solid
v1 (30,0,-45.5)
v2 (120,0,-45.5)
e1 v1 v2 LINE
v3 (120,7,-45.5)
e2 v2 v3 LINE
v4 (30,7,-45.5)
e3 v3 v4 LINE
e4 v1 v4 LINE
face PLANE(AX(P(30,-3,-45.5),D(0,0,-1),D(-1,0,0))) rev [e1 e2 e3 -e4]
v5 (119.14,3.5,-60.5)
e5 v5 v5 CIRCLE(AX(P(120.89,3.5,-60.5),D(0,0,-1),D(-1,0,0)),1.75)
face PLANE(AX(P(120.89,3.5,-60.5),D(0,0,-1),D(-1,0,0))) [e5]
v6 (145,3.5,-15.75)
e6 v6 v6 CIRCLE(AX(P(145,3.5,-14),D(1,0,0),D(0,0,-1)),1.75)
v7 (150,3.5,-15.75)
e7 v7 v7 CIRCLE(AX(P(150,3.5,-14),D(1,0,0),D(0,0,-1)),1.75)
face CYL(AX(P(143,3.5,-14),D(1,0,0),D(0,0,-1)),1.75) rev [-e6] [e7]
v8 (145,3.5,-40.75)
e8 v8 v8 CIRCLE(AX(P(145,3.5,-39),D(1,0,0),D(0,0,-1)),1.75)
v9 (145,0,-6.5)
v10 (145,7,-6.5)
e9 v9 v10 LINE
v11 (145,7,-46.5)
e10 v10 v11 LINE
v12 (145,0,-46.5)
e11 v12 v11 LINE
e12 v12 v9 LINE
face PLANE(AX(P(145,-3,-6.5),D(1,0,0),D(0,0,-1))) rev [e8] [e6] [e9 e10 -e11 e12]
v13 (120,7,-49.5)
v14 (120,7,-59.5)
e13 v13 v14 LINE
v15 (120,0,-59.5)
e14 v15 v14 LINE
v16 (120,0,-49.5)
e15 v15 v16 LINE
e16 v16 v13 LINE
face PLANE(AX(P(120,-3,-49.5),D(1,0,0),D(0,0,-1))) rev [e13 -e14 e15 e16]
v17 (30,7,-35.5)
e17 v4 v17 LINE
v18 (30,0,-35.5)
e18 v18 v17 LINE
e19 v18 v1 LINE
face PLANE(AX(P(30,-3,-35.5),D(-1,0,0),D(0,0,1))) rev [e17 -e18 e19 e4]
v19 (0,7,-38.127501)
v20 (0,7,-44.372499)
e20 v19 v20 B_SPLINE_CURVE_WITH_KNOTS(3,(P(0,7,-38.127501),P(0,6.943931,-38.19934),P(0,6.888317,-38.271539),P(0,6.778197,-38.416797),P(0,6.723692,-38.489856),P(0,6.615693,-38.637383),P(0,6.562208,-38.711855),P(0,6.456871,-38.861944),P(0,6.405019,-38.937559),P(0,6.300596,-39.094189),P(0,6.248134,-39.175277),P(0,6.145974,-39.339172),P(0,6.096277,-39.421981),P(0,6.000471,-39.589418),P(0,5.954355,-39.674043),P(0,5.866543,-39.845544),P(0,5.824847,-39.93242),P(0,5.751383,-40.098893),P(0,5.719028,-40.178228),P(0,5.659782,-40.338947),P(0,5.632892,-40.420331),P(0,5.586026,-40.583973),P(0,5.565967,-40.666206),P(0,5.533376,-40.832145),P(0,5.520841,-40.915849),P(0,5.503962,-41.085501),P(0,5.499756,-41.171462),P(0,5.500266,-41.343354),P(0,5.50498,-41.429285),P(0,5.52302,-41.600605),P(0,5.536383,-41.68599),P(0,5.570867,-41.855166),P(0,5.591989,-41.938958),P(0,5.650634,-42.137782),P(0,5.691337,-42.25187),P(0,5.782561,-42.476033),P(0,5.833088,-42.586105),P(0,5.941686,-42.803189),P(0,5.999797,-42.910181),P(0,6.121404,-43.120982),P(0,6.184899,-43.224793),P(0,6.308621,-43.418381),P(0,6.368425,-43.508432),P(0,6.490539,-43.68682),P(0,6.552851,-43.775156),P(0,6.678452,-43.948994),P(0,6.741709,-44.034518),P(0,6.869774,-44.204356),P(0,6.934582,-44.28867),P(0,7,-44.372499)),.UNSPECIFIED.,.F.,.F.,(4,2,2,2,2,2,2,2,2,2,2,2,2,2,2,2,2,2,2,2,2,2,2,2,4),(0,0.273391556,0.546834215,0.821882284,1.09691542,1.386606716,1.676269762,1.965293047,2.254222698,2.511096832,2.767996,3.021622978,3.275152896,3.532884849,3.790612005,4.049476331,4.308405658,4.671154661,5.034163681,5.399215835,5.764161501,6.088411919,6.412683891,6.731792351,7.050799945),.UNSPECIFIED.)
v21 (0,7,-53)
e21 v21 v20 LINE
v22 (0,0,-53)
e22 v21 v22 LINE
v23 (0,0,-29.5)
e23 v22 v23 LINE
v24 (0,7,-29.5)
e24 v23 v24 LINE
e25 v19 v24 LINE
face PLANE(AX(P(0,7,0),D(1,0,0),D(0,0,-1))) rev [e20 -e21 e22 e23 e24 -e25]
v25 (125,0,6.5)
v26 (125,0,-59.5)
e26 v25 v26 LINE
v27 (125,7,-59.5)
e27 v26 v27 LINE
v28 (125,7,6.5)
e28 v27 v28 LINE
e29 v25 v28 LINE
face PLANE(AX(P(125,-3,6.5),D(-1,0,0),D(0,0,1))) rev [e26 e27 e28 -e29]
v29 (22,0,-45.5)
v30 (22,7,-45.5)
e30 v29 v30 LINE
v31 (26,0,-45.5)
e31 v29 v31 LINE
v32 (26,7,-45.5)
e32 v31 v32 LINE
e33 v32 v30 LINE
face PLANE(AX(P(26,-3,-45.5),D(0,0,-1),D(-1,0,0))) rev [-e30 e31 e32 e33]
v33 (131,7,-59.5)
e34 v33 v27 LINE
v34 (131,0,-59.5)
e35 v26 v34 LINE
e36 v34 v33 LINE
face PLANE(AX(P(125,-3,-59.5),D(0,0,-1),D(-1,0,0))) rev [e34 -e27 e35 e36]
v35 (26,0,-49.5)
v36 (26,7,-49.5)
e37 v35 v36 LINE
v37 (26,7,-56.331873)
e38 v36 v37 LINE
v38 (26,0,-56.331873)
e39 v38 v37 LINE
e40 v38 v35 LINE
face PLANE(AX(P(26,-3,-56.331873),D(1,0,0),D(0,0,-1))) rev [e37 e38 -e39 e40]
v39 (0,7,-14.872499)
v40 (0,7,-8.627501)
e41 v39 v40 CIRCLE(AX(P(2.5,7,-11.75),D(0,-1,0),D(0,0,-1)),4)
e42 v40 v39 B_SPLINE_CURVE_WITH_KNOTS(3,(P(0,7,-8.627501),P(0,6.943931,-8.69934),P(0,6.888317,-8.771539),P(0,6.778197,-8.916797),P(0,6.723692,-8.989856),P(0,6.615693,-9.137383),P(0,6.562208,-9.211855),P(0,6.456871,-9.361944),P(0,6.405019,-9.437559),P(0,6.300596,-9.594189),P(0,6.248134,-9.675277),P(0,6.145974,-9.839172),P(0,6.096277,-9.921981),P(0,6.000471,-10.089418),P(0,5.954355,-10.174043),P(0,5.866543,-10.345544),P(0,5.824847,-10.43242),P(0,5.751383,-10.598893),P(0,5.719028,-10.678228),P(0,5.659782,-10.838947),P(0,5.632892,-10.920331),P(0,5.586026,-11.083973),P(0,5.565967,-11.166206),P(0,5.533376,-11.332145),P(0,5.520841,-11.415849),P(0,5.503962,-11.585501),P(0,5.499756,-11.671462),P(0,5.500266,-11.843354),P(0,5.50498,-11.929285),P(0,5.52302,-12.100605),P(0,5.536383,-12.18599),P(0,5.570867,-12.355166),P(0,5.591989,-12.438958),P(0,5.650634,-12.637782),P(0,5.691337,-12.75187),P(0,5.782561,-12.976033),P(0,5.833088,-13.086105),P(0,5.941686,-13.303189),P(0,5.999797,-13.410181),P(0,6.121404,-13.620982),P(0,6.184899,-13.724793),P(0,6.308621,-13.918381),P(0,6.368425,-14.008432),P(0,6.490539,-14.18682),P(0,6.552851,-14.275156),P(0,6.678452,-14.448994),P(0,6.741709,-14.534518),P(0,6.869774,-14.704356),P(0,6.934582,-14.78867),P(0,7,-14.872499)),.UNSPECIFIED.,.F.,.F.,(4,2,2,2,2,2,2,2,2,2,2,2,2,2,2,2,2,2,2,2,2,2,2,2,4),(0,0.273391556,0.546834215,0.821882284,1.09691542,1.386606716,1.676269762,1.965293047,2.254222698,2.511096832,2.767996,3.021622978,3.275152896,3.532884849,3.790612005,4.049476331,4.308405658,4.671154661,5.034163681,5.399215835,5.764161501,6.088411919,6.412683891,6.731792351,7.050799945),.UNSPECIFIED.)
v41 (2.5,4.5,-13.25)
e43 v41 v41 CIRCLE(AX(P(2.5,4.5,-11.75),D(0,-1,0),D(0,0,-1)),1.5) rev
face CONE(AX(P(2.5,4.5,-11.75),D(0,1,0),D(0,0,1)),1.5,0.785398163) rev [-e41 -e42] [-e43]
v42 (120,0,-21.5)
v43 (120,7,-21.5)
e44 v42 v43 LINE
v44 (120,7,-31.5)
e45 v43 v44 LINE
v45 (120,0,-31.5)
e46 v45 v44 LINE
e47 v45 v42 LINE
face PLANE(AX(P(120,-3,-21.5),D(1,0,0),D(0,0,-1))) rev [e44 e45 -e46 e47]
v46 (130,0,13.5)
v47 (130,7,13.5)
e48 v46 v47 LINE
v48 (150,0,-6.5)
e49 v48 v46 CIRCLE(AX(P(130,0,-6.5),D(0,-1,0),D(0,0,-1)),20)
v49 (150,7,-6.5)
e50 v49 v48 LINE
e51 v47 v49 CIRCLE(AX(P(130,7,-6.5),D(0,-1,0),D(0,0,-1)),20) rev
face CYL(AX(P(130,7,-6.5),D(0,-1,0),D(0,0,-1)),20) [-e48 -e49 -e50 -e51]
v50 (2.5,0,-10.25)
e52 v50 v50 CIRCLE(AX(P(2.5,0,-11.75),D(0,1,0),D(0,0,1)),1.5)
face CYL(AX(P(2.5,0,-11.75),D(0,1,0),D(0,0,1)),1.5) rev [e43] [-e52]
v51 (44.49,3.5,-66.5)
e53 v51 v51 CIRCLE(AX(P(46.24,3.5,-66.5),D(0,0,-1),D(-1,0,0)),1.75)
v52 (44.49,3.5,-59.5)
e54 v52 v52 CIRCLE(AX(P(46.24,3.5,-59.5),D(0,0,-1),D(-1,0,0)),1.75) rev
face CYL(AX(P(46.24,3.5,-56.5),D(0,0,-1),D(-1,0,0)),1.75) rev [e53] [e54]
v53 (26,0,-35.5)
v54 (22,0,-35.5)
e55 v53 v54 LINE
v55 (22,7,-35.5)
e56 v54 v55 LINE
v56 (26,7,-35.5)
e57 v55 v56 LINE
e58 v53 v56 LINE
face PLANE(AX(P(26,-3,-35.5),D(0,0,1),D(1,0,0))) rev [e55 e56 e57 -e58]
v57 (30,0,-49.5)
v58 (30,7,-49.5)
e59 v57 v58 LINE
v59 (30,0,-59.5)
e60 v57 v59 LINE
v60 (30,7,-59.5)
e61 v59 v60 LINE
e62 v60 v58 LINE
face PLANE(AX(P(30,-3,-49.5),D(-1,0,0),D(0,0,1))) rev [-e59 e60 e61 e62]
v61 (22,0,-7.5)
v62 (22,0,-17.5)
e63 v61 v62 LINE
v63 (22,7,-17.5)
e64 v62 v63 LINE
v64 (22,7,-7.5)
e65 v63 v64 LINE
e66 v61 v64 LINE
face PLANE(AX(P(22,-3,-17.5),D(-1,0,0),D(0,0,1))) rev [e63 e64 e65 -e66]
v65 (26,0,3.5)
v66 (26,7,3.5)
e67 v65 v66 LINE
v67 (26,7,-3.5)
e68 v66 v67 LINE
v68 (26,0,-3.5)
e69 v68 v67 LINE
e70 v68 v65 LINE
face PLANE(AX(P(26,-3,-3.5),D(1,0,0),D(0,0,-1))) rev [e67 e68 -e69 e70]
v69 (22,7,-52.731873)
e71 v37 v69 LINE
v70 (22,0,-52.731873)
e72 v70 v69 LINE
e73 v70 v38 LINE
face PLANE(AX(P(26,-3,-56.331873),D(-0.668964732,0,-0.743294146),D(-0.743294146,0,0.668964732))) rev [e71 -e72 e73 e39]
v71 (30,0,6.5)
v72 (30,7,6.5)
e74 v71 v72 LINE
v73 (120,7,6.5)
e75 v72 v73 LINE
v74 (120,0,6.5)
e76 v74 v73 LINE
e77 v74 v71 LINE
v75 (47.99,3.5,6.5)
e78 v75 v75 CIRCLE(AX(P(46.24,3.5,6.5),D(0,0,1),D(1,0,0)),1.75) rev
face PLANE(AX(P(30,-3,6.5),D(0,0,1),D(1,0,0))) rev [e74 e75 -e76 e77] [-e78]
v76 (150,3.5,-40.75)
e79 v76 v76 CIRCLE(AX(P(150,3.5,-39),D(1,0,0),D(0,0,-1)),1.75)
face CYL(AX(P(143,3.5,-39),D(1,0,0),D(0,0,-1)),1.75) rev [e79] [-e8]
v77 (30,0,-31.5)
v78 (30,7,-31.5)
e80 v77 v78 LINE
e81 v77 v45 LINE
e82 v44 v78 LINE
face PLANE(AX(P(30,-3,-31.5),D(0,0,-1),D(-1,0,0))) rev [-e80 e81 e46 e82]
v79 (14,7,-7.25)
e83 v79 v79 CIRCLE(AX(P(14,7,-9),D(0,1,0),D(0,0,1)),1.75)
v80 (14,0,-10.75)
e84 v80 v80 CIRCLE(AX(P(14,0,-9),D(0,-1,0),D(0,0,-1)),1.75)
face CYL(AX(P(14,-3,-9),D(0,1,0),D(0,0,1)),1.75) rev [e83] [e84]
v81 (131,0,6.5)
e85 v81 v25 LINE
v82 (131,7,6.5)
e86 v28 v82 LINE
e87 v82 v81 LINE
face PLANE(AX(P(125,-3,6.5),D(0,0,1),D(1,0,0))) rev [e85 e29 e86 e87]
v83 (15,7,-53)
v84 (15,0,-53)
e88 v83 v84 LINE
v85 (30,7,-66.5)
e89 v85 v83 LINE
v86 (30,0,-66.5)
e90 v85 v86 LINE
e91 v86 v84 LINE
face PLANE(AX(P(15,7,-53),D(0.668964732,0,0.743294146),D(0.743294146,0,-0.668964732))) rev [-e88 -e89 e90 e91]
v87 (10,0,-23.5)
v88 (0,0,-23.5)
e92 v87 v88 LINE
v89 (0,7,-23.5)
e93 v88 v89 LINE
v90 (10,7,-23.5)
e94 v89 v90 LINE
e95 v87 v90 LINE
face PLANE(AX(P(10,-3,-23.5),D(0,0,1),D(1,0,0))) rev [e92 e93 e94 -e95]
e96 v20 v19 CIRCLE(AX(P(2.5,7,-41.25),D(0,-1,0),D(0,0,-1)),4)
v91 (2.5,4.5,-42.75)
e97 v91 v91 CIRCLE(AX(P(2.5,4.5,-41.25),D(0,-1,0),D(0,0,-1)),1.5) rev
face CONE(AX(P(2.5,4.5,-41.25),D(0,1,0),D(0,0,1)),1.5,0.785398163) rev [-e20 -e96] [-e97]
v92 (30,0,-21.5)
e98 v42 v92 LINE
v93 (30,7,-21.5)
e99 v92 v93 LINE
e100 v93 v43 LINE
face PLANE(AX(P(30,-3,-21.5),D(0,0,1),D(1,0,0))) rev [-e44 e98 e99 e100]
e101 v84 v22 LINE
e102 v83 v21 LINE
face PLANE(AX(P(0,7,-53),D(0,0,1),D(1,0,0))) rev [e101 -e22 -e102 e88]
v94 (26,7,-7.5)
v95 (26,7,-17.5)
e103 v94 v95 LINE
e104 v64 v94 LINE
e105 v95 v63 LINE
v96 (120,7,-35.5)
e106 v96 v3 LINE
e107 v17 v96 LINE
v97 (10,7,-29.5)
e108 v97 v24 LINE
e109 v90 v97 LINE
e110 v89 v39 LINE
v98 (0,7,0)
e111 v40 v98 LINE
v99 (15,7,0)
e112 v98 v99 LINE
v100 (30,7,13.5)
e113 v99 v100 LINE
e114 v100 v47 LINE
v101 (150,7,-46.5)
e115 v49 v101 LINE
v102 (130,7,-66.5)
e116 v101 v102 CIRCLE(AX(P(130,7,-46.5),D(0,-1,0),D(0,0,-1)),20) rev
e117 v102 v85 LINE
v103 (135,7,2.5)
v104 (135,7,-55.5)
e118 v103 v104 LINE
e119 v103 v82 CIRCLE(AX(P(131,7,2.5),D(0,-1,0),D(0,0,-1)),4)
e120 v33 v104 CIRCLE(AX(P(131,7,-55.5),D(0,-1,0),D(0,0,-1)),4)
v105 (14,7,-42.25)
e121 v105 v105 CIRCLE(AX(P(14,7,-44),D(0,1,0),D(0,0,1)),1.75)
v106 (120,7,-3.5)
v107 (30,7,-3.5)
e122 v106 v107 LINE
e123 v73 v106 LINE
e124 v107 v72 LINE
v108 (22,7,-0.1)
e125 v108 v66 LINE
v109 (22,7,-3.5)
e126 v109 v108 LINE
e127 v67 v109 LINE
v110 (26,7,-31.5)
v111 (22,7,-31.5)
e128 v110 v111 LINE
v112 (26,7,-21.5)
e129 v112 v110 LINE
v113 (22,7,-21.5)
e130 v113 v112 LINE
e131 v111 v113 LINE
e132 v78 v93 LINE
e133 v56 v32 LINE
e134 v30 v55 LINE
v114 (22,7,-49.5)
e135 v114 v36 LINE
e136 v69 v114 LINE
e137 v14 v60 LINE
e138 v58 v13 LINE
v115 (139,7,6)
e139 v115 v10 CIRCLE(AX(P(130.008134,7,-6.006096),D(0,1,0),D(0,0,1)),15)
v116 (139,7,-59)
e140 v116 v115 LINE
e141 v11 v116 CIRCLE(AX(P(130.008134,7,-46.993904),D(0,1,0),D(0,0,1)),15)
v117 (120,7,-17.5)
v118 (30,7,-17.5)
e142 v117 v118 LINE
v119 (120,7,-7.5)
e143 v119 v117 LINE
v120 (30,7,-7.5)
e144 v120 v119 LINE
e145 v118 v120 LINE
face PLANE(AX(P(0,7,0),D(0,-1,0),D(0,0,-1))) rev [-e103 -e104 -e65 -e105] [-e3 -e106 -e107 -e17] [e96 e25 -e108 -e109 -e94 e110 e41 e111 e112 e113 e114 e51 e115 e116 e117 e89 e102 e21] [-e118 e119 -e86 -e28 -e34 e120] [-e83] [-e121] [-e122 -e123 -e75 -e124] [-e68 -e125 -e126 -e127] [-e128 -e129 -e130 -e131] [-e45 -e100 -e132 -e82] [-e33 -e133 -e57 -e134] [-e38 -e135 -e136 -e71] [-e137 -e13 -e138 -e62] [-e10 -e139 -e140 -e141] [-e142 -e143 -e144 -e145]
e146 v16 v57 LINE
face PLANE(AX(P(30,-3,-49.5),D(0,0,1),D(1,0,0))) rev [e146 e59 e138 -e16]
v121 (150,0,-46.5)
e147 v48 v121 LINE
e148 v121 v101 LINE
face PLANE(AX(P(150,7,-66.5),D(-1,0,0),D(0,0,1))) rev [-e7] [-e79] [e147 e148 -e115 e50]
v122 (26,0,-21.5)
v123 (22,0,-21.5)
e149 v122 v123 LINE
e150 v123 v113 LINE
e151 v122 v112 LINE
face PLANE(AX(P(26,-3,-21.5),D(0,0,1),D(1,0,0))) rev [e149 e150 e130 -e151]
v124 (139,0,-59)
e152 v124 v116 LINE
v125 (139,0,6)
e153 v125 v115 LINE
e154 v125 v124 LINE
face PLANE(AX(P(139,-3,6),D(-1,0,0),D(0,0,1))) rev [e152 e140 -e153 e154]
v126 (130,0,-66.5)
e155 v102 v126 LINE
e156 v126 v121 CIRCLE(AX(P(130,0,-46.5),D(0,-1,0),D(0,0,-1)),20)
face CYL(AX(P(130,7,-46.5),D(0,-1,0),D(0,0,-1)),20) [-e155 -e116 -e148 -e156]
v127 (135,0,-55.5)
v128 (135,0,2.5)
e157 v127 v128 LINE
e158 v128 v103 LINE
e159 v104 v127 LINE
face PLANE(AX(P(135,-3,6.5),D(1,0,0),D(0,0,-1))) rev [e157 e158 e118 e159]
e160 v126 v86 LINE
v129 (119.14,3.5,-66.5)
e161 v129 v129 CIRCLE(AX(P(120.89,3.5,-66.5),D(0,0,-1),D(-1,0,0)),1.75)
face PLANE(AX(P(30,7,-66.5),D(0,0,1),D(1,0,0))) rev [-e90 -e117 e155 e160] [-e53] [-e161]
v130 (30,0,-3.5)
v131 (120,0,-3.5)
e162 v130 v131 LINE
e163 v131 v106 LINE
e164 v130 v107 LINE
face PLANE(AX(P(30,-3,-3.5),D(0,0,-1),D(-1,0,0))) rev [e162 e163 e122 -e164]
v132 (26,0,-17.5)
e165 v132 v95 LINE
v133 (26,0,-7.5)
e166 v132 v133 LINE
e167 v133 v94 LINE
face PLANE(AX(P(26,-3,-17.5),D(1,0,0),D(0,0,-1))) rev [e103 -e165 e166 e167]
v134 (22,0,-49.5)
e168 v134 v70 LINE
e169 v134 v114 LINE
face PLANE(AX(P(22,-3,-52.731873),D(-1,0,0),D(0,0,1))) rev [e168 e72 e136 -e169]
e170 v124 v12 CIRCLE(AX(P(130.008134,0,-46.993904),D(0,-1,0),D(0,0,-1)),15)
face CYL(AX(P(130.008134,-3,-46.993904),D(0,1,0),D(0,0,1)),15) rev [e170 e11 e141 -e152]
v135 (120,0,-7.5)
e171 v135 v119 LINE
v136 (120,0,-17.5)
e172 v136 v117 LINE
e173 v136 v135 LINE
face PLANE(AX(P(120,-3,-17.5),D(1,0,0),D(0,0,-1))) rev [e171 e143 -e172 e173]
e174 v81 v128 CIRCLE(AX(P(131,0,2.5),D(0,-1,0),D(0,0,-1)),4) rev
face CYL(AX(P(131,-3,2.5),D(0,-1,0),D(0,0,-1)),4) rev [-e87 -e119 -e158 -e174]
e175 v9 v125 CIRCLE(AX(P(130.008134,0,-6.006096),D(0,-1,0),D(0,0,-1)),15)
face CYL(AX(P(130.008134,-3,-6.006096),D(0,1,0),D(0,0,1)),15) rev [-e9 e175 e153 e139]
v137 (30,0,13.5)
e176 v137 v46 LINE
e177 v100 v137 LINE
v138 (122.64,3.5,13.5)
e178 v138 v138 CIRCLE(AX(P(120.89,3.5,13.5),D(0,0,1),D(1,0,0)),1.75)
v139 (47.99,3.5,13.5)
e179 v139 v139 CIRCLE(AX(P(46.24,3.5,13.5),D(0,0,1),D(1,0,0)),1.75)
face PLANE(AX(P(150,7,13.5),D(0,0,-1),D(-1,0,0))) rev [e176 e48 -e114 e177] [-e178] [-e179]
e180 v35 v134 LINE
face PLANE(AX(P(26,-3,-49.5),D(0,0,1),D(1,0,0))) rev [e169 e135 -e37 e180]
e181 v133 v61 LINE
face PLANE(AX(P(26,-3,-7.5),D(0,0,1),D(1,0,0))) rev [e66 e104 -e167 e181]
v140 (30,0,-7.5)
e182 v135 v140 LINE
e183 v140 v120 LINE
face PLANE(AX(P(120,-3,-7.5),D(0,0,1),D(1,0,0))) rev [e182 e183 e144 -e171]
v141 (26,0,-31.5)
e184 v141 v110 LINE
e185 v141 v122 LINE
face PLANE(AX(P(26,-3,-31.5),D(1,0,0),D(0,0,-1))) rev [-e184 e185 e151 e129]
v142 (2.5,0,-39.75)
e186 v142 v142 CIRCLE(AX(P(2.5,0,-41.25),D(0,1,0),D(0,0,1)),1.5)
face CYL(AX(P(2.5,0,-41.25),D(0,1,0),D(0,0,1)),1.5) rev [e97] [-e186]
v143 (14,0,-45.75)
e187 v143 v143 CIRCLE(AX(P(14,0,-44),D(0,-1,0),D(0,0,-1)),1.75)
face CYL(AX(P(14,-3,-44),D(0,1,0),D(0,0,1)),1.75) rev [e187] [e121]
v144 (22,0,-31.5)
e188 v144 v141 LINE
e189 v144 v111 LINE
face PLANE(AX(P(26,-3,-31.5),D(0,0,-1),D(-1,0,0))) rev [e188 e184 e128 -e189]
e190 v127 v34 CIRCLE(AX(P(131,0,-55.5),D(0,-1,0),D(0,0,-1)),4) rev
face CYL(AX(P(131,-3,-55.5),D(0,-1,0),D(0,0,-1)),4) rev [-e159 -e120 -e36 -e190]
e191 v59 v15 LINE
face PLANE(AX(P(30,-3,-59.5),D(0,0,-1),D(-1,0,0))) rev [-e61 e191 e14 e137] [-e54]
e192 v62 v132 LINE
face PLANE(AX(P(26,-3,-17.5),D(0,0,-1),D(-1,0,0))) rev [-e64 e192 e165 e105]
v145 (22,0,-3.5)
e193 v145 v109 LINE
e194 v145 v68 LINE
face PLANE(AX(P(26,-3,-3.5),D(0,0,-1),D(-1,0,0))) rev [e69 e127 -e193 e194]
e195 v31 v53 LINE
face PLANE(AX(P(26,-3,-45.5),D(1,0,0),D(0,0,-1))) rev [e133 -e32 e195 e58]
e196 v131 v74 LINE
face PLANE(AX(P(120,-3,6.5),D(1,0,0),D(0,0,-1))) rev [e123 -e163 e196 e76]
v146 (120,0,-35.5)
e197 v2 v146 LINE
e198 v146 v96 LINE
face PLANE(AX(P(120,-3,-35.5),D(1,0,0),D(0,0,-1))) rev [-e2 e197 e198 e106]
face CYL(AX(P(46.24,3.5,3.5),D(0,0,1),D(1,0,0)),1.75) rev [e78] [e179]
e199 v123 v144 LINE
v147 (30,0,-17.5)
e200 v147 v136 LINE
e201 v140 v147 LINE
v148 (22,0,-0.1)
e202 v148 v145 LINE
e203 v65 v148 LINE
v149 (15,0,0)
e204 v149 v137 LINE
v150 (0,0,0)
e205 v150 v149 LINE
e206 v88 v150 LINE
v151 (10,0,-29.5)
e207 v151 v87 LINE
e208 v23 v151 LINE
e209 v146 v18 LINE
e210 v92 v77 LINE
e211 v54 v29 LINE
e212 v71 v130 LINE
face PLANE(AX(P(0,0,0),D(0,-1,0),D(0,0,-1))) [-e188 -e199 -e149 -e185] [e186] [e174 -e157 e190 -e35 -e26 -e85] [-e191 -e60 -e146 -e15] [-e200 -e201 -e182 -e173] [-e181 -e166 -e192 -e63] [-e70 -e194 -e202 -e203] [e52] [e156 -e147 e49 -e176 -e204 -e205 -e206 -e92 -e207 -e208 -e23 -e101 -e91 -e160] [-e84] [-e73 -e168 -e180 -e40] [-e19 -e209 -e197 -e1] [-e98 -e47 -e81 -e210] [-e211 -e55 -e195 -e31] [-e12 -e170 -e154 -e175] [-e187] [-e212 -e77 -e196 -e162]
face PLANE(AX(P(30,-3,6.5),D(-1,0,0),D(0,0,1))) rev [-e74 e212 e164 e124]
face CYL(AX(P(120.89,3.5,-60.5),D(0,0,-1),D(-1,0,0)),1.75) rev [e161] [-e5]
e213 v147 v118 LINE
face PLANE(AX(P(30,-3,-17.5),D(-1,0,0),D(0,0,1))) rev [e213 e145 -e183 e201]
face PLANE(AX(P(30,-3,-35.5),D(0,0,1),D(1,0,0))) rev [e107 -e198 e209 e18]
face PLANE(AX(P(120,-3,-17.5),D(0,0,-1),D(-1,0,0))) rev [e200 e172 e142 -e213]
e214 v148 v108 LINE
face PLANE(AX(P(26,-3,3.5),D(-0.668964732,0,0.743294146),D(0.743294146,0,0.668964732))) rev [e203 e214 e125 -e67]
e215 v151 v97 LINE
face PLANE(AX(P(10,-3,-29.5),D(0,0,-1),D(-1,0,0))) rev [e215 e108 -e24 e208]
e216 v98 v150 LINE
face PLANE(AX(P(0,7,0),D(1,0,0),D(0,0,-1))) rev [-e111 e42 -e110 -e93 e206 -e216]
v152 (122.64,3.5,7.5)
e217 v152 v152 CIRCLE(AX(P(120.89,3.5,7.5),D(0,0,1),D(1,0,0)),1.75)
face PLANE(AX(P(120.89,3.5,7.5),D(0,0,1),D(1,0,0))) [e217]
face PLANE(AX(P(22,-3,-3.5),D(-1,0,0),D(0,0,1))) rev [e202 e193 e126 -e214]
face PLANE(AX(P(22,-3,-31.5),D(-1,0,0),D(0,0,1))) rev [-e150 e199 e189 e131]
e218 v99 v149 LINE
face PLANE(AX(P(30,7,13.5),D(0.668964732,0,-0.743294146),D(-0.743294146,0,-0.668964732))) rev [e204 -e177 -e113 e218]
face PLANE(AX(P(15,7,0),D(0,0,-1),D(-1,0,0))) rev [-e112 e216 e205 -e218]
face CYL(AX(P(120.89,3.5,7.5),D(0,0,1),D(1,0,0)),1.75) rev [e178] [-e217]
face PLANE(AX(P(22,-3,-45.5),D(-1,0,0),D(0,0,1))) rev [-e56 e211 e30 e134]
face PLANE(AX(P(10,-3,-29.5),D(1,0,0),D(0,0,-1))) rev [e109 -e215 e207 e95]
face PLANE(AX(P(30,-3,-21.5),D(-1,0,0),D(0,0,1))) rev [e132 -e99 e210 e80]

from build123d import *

# Parameters (mm, degrees)
Y_KSEKLIK_EKSTR_ZYON1_DEPTH = 7
IZIM2_R                     = 1.5
KES_EKSTR_ZYON1_DEPTH       = 7
PAH1_SIZE                   = 2.5
IZIM3_R                     = 1.75
KES_EKSTR_ZYON2_DEPTH       = 10
KES_EKSTR_ZYON3_START       = -10
IZIM4_R                     = 1.75
KES_EKSTR_ZYON3_DEPTH       = 10
RADYUS1_R                   = 20
IZIM5_W                     = 90
IZIM5_H                     = 10
IZIM5_W_2                   = 10
IZIM5_H_2                   = 66
KES_EKSTR_ZYON4_DEPTH       = 10
RADYUS2_R                   = 4
KES_EKSTR_ZYON5_DEPTH       = 10
IZIM7_R                     = 1.75
KES_EKSTR_ZYON6_DEPTH       = 7
IZIM8_W                     = 10
IZIM8_H                     = 6
KES_EKSTR_ZYON7_DEPTH       = 10
IZIM9_R                     = 1.75
KES_EKSTR_ZYON8_DEPTH       = 10
IZIM10_R                    = 1.75
KES_EKSTR_ZYON9_DEPTH       = 6
KES_EKSTR_ZYON10_START      = -6
IZIM11_R                    = 1.75
KES_EKSTR_ZYON10_DEPTH      = 6
IZIM12_W                    = 4
IZIM12_H                    = 10
KES_EKSTR_ZYON11_DEPTH      = 10


with BuildPart() as part:
    # Çizim1 → Yükseklik-Ekstrüzyon1 (new body)
    with BuildSketch(Plane(origin=(0, 0, 0), x_dir=(1, 0, 0), z_dir=(0, 1, 0))):
        Polygon((0, 0), (0, 53), (15, 53), (30, 66.5), (150, 66.5), (150, -13.5), (30, -13.5), (15, 0), align=None)
    extrude(amount=Y_KSEKLIK_EKSTR_ZYON1_DEPTH)

    # Çizim2 → Kes-Ekstrüzyon1 (cut)
    with BuildSketch(Plane(origin=(0, 7, 0), x_dir=(1, 0, 0), z_dir=(0, 1, 0))):
        with Locations(Location((2.5, 41.25, 0), (0, 0, 270))):
            Circle(IZIM2_R)
        with Locations(Location((2.5, 11.75, 0), (0, 0, 270))):
            Circle(IZIM2_R)
    extrude(amount=-KES_EKSTR_ZYON1_DEPTH, mode=Mode.SUBTRACT)

    # Pah1
    # the kernel refuses this chamfer: 2.5 mm, written as the material it takes off along each edge
    with BuildSketch(Plane(origin=(2.5, 7, -41.25), x_dir=(0, 0, 1), z_dir=(-1, 0, 0))) as pah1_piece_1:
        Polygon((1.5 + PAH1_SIZE, 0), (1.5, -PAH1_SIZE), (1.5, 0), align=None)
    revolve(axis=Axis((2.5, 7, -41.25), (0, 1, 0)), mode=Mode.SUBTRACT)
    with BuildSketch(Plane(origin=(2.5, 7, -11.75), x_dir=(0, 0, 1), z_dir=(-1, 0, 0))) as pah1_piece_2:
        Polygon((1.5 + PAH1_SIZE, 0), (1.5, -PAH1_SIZE), (1.5, 0), align=None)
    revolve(axis=Axis((2.5, 7, -11.75), (0, 1, 0)), mode=Mode.SUBTRACT)

    # Çizim3 → Kes-Ekstrüzyon2 (cut)
    with BuildSketch(Plane.XY.offset(13.5)):
        with Locations((46.24, 3.5)):
            Circle(IZIM3_R)
    extrude(amount=-KES_EKSTR_ZYON2_DEPTH, mode=Mode.SUBTRACT)

    # Çizim4 → Kes-Ekstrüzyon3 (cut)
    with BuildSketch(Plane(origin=(0, 0, -66.5), x_dir=(-1, 0, 0), z_dir=(0, 0, -1)).offset(KES_EKSTR_ZYON3_START)):
        with Locations(Location((-46.24, 3.5, 0), (0, 0, 180))):
            Circle(IZIM4_R)
    extrude(amount=KES_EKSTR_ZYON3_DEPTH, mode=Mode.SUBTRACT)

    # Radyus1
    radyus1_edges = [part.edges().sort_by_distance(p)[0] for p in [
        (150, 3.5, -66.5),
        (150, 3.5, 13.5),
    ]]
    fillet(radyus1_edges, radius=RADYUS1_R)

    # Çizim5 → Kes-Ekstrüzyon4 (cut)
    with BuildSketch(Plane(origin=(0, 7, 0), x_dir=(1, 0, 0), z_dir=(0, 1, 0))):
        with Locations((75, -1.5)):
            Rectangle(IZIM5_W, IZIM5_H)
        with Locations((75, 26.5)):
            Rectangle(IZIM5_W, IZIM5_H)
        with Locations((75, 40.5)):
            Rectangle(IZIM5_W, IZIM5_H)
        with Locations((75, 54.5)):
            Rectangle(IZIM5_W, IZIM5_H)
        with Locations((75, 12.5)):
            Rectangle(IZIM5_W, IZIM5_H)
        with Locations((130, 26.5)):
            Rectangle(IZIM5_W_2, IZIM5_H_2)
    extrude(amount=-KES_EKSTR_ZYON4_DEPTH, mode=Mode.SUBTRACT)

    # Radyus2
    radyus2_edges = [part.edges().sort_by_distance(p)[0] for p in [
        (135, 3.5, -59.5),
        (135, 3.5, 6.5),
    ]]
    fillet(radyus2_edges, radius=RADYUS2_R)

    # Çizim6 → Kes-Ekstrüzyon5 (cut)
    with BuildSketch(Plane(origin=(0, 7, 0), x_dir=(1, 0, 0), z_dir=(0, 1, 0))):
        with BuildLine():
            Line((139, -6), (139, 59))
            ThreePointArc((139, 59), (143.530979443, 53.484870133), (145, 46.5))
            Line((145, 46.5), (145, 6.5))
            ThreePointArc((145, 6.5), (143.530979443, -0.484870133), (139, -6))
        make_face()
    extrude(amount=-KES_EKSTR_ZYON5_DEPTH, mode=Mode.SUBTRACT)

    # Çizim7 → Kes-Ekstrüzyon6 (cut)
    with BuildSketch(Plane(origin=(150, 0, 0), x_dir=(0, 0, -1), z_dir=(1, 0, 0))):
        with Locations((14, 3.5)):
            Circle(IZIM7_R)
        with Locations((39, 3.5)):
            Circle(IZIM7_R)
    extrude(amount=-KES_EKSTR_ZYON6_DEPTH, mode=Mode.SUBTRACT)

    # Çizim8 → Kes-Ekstrüzyon7 (cut)
    with BuildSketch(Plane(origin=(0, 7, 0), x_dir=(1, 0, 0), z_dir=(0, 1, 0))):
        with Locations((5, 26.5)):
            Rectangle(IZIM8_W, IZIM8_H)
    extrude(amount=-KES_EKSTR_ZYON7_DEPTH, mode=Mode.SUBTRACT)

    # Çizim9 → Kes-Ekstrüzyon8 (cut)
    with BuildSketch(Plane(origin=(0, 7, 0), x_dir=(1, 0, 0), z_dir=(0, 1, 0))):
        with Locations(Location((14, 44, 0), (0, 0, 270))):
            Circle(IZIM9_R)
        with Locations(Location((14, 9, 0), (0, 0, 270))):
            Circle(IZIM9_R)
    extrude(amount=-KES_EKSTR_ZYON8_DEPTH, mode=Mode.SUBTRACT)

    # Çizim10 → Kes-Ekstrüzyon9 (cut)
    with BuildSketch(Plane.XY.offset(13.5)):
        with Locations((120.89, 3.5)):
            Circle(IZIM10_R)
    extrude(amount=-KES_EKSTR_ZYON9_DEPTH, mode=Mode.SUBTRACT)

    # Çizim11 → Kes-Ekstrüzyon10 (cut)
    with BuildSketch(Plane(origin=(0, 0, -66.5), x_dir=(-1, 0, 0), z_dir=(0, 0, -1)).offset(KES_EKSTR_ZYON10_START)):
        with Locations(Location((-120.89, 3.5, 0), (0, 0, 180))):
            Circle(IZIM11_R)
    extrude(amount=KES_EKSTR_ZYON10_DEPTH, mode=Mode.SUBTRACT)

    # Çizim12 → Kes-Ekstrüzyon11 (cut)
    with BuildSketch(Plane(origin=(0, 7, 0), x_dir=(1, 0, 0), z_dir=(0, 1, 0))):
        Polygon((26, 56.331873347), (26, 49.5), (22, 49.5), (22, 52.731873347), align=None)
        Polygon((26, -3.5), (22, 0.1), (22, 3.5), (26, 3.5), align=None)
        with Locations((24, 40.5)):
            Rectangle(IZIM12_W, IZIM12_H)
        with Locations((24, 26.5)):
            Rectangle(IZIM12_W, IZIM12_H)
        with Locations((24, 12.5)):
            Rectangle(IZIM12_W, IZIM12_H)
    extrude(amount=-KES_EKSTR_ZYON11_DEPTH, mode=Mode.SUBTRACT)


solid = part.part
